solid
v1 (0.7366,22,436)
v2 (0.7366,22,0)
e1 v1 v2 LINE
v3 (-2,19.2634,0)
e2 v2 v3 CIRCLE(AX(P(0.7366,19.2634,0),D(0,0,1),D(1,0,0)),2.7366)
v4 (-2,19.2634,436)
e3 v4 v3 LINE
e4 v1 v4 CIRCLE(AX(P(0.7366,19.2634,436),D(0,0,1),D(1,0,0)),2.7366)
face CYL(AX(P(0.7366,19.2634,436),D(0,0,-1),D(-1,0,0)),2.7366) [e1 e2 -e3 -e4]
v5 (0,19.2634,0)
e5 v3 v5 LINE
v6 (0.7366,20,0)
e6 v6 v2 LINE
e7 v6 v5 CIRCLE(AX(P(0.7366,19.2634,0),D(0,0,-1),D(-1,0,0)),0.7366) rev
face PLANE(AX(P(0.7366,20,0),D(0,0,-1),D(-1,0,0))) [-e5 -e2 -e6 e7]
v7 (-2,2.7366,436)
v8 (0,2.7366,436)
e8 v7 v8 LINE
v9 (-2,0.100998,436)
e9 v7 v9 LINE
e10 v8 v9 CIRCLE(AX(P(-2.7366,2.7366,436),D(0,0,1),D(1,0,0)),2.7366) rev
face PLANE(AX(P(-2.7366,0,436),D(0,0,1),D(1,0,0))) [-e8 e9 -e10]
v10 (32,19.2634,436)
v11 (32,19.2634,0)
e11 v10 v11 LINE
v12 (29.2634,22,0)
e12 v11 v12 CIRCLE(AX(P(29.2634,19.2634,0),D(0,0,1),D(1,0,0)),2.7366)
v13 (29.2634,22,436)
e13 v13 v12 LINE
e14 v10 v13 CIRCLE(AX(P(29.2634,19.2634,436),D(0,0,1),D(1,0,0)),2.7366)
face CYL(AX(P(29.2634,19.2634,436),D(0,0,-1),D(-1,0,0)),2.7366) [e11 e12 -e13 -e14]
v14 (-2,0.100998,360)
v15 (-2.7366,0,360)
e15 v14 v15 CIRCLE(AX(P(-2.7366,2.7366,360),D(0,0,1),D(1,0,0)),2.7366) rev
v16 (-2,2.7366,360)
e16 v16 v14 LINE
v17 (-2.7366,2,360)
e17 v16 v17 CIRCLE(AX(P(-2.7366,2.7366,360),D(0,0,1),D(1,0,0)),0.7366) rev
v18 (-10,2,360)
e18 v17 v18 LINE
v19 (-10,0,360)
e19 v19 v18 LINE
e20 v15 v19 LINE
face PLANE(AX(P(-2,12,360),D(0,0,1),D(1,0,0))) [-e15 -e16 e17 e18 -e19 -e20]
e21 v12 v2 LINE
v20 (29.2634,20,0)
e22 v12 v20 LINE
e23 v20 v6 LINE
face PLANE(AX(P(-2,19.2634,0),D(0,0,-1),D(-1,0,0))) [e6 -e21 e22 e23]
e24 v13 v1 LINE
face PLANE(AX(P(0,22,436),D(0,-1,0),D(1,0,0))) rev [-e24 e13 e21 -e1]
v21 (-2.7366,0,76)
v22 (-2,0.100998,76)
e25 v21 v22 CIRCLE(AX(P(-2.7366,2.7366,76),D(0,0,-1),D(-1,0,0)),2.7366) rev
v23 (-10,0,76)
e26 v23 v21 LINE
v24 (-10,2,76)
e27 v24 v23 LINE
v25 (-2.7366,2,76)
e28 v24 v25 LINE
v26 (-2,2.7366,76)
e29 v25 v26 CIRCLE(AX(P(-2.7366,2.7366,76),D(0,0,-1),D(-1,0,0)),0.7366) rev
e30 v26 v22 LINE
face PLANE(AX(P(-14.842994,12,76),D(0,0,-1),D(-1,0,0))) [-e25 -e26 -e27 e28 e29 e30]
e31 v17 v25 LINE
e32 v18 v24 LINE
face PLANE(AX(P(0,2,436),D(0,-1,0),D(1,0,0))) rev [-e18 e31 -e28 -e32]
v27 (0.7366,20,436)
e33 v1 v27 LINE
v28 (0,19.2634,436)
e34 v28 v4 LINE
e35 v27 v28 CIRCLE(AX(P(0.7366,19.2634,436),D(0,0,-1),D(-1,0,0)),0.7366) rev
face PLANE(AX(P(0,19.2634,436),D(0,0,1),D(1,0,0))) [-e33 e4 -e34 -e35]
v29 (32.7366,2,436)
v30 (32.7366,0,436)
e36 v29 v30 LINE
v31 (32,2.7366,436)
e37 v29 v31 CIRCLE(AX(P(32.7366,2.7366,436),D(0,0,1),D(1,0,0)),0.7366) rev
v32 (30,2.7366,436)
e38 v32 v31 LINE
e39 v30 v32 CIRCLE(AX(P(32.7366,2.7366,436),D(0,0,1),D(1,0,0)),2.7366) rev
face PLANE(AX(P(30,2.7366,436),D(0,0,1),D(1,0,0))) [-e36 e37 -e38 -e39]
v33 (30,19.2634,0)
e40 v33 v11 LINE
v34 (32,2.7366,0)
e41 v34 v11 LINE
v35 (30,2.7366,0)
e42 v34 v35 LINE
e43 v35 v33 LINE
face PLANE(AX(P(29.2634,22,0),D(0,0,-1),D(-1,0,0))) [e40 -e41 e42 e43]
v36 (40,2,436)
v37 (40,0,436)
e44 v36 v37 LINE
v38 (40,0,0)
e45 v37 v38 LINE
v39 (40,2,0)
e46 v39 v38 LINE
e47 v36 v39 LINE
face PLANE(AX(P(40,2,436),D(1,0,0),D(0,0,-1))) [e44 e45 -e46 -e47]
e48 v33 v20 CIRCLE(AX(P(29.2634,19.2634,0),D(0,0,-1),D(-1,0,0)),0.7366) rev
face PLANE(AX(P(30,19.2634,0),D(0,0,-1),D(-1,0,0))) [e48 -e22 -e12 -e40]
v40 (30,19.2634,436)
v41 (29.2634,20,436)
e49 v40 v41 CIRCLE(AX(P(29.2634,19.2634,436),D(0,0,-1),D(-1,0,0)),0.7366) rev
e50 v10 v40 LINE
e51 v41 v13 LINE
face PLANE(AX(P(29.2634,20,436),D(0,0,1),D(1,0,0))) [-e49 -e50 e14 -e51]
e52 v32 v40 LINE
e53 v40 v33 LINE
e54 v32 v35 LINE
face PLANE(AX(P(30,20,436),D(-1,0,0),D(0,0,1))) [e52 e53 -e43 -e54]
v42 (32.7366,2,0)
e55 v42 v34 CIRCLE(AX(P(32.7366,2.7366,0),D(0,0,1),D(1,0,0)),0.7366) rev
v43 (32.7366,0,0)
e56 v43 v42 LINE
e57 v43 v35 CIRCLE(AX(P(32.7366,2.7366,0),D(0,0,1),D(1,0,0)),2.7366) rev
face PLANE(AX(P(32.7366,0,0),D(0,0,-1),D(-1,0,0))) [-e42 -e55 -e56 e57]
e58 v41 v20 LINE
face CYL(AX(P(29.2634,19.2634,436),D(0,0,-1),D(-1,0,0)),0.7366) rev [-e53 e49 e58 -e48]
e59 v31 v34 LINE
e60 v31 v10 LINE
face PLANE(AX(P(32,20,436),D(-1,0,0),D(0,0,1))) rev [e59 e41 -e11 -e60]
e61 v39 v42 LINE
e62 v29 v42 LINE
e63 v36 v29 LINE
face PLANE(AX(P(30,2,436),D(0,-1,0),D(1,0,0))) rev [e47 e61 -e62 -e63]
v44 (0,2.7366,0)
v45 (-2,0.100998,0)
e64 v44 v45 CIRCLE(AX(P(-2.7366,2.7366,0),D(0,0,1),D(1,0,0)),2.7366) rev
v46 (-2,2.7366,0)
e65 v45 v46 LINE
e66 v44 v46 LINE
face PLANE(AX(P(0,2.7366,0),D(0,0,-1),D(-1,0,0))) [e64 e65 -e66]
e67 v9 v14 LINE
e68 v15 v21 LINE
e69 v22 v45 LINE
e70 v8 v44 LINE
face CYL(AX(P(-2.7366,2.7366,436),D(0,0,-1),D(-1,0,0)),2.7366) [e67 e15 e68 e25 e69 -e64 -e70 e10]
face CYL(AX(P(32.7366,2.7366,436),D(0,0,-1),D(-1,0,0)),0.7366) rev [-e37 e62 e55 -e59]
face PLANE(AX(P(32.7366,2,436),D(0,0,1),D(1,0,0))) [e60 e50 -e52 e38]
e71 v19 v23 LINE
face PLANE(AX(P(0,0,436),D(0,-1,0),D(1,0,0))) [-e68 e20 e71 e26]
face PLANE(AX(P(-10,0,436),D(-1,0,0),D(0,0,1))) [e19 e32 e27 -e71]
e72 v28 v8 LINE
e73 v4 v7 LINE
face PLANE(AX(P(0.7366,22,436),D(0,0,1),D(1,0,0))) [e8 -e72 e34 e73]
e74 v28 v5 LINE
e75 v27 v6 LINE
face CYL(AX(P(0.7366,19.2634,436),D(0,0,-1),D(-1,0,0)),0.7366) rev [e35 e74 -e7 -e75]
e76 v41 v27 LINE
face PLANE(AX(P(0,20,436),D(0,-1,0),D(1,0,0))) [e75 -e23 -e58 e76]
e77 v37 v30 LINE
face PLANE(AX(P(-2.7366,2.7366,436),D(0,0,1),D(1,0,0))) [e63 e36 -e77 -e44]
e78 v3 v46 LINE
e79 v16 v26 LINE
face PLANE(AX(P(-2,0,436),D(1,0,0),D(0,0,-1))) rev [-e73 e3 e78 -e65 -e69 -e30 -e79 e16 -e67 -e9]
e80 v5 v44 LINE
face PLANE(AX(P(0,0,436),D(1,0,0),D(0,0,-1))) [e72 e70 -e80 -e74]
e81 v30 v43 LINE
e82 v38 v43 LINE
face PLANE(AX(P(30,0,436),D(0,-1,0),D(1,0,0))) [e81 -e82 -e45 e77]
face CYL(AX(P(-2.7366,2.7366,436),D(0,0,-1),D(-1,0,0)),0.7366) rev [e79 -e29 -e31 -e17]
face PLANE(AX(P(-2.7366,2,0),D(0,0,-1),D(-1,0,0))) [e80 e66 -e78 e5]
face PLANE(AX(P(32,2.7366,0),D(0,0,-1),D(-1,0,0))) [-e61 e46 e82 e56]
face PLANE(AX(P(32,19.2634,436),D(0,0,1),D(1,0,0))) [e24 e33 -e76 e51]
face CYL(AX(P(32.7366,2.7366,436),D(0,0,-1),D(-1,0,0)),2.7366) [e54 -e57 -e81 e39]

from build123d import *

# Parameters (mm, degrees)
SM_BASE_FLANGE_1_DEPTH   = 436
CUT_EXTRUDE_1_DEPTH      = 10
CUT_EXTRUDE_1_DEPTH_BACK = 10
SKETCH_2_W               = 12.842994449
SKETCH_2_H               = 79.921875175
SKETCH_2_W_2             = 14.142108975
SKETCH_2_H_2             = 88.32377597


# Sheet-metal steps are written as plain solids
with BuildPart() as part:
    # Sketch 1 → 基体-法兰1 (new body)
    with BuildSketch(Plane.XY):
        with BuildLine():
            Line((-10, 0), (-2.7366, 0))
            ThreePointArc((-2.7366, 0), (-0.801531583, 0.801531583), (0, 2.7366))
            Line((0, 2.7366), (0, 19.2634))
            ThreePointArc((0, 19.2634), (0.215745145, 19.784254855), (0.7366, 20))
            Line((0.7366, 20), (29.2634, 20))
            ThreePointArc((29.2634, 20), (29.784254855, 19.784254855), (30, 19.2634))
            Line((30, 19.2634), (30, 2.7366))
            ThreePointArc((30, 2.7366), (30.801531583, 0.801531583), (32.7366, 0))
            Line((32.7366, 0), (40, 0))
            Line((40, 0), (40, 2))
            Line((40, 2), (32.7366, 2))
            ThreePointArc((32.7366, 2), (32.215745145, 2.215745145), (32, 2.7366))
            Line((32, 2.7366), (32, 19.2634))
            ThreePointArc((32, 19.2634), (31.198468417, 21.198468417), (29.2634, 22))
            Line((29.2634, 22), (0.7366, 22))
            ThreePointArc((0.7366, 22), (-1.198468417, 21.198468417), (-2, 19.2634))
            Line((-2, 19.2634), (-2, 2.7366))
            ThreePointArc((-2, 2.7366), (-2.215745145, 2.215745145), (-2.7366, 2))
            Line((-2.7366, 2), (-10, 2))
            Line((-10, 2), (-10, 0))
        make_face()
    extrude(amount=SM_BASE_FLANGE_1_DEPTH)

    # Sketch 2 → 切除-拉伸1 (cut, two sides: drawn at the far end of the back side and taken through both)
    with BuildSketch(Plane(origin=(0, 2, 0), x_dir=(1, 0, 0), z_dir=(0, 1, 0)).offset(-CUT_EXTRUDE_1_DEPTH_BACK)):
        with Locations((-8.421497225, -36.039062413)):
            Rectangle(SKETCH_2_W, SKETCH_2_H)
        with Locations((-9.071054487, -404.161887985)):
            Rectangle(SKETCH_2_W_2, SKETCH_2_H_2)
    extrude(amount=CUT_EXTRUDE_1_DEPTH + CUT_EXTRUDE_1_DEPTH_BACK, mode=Mode.SUBTRACT)


solid = part.part
